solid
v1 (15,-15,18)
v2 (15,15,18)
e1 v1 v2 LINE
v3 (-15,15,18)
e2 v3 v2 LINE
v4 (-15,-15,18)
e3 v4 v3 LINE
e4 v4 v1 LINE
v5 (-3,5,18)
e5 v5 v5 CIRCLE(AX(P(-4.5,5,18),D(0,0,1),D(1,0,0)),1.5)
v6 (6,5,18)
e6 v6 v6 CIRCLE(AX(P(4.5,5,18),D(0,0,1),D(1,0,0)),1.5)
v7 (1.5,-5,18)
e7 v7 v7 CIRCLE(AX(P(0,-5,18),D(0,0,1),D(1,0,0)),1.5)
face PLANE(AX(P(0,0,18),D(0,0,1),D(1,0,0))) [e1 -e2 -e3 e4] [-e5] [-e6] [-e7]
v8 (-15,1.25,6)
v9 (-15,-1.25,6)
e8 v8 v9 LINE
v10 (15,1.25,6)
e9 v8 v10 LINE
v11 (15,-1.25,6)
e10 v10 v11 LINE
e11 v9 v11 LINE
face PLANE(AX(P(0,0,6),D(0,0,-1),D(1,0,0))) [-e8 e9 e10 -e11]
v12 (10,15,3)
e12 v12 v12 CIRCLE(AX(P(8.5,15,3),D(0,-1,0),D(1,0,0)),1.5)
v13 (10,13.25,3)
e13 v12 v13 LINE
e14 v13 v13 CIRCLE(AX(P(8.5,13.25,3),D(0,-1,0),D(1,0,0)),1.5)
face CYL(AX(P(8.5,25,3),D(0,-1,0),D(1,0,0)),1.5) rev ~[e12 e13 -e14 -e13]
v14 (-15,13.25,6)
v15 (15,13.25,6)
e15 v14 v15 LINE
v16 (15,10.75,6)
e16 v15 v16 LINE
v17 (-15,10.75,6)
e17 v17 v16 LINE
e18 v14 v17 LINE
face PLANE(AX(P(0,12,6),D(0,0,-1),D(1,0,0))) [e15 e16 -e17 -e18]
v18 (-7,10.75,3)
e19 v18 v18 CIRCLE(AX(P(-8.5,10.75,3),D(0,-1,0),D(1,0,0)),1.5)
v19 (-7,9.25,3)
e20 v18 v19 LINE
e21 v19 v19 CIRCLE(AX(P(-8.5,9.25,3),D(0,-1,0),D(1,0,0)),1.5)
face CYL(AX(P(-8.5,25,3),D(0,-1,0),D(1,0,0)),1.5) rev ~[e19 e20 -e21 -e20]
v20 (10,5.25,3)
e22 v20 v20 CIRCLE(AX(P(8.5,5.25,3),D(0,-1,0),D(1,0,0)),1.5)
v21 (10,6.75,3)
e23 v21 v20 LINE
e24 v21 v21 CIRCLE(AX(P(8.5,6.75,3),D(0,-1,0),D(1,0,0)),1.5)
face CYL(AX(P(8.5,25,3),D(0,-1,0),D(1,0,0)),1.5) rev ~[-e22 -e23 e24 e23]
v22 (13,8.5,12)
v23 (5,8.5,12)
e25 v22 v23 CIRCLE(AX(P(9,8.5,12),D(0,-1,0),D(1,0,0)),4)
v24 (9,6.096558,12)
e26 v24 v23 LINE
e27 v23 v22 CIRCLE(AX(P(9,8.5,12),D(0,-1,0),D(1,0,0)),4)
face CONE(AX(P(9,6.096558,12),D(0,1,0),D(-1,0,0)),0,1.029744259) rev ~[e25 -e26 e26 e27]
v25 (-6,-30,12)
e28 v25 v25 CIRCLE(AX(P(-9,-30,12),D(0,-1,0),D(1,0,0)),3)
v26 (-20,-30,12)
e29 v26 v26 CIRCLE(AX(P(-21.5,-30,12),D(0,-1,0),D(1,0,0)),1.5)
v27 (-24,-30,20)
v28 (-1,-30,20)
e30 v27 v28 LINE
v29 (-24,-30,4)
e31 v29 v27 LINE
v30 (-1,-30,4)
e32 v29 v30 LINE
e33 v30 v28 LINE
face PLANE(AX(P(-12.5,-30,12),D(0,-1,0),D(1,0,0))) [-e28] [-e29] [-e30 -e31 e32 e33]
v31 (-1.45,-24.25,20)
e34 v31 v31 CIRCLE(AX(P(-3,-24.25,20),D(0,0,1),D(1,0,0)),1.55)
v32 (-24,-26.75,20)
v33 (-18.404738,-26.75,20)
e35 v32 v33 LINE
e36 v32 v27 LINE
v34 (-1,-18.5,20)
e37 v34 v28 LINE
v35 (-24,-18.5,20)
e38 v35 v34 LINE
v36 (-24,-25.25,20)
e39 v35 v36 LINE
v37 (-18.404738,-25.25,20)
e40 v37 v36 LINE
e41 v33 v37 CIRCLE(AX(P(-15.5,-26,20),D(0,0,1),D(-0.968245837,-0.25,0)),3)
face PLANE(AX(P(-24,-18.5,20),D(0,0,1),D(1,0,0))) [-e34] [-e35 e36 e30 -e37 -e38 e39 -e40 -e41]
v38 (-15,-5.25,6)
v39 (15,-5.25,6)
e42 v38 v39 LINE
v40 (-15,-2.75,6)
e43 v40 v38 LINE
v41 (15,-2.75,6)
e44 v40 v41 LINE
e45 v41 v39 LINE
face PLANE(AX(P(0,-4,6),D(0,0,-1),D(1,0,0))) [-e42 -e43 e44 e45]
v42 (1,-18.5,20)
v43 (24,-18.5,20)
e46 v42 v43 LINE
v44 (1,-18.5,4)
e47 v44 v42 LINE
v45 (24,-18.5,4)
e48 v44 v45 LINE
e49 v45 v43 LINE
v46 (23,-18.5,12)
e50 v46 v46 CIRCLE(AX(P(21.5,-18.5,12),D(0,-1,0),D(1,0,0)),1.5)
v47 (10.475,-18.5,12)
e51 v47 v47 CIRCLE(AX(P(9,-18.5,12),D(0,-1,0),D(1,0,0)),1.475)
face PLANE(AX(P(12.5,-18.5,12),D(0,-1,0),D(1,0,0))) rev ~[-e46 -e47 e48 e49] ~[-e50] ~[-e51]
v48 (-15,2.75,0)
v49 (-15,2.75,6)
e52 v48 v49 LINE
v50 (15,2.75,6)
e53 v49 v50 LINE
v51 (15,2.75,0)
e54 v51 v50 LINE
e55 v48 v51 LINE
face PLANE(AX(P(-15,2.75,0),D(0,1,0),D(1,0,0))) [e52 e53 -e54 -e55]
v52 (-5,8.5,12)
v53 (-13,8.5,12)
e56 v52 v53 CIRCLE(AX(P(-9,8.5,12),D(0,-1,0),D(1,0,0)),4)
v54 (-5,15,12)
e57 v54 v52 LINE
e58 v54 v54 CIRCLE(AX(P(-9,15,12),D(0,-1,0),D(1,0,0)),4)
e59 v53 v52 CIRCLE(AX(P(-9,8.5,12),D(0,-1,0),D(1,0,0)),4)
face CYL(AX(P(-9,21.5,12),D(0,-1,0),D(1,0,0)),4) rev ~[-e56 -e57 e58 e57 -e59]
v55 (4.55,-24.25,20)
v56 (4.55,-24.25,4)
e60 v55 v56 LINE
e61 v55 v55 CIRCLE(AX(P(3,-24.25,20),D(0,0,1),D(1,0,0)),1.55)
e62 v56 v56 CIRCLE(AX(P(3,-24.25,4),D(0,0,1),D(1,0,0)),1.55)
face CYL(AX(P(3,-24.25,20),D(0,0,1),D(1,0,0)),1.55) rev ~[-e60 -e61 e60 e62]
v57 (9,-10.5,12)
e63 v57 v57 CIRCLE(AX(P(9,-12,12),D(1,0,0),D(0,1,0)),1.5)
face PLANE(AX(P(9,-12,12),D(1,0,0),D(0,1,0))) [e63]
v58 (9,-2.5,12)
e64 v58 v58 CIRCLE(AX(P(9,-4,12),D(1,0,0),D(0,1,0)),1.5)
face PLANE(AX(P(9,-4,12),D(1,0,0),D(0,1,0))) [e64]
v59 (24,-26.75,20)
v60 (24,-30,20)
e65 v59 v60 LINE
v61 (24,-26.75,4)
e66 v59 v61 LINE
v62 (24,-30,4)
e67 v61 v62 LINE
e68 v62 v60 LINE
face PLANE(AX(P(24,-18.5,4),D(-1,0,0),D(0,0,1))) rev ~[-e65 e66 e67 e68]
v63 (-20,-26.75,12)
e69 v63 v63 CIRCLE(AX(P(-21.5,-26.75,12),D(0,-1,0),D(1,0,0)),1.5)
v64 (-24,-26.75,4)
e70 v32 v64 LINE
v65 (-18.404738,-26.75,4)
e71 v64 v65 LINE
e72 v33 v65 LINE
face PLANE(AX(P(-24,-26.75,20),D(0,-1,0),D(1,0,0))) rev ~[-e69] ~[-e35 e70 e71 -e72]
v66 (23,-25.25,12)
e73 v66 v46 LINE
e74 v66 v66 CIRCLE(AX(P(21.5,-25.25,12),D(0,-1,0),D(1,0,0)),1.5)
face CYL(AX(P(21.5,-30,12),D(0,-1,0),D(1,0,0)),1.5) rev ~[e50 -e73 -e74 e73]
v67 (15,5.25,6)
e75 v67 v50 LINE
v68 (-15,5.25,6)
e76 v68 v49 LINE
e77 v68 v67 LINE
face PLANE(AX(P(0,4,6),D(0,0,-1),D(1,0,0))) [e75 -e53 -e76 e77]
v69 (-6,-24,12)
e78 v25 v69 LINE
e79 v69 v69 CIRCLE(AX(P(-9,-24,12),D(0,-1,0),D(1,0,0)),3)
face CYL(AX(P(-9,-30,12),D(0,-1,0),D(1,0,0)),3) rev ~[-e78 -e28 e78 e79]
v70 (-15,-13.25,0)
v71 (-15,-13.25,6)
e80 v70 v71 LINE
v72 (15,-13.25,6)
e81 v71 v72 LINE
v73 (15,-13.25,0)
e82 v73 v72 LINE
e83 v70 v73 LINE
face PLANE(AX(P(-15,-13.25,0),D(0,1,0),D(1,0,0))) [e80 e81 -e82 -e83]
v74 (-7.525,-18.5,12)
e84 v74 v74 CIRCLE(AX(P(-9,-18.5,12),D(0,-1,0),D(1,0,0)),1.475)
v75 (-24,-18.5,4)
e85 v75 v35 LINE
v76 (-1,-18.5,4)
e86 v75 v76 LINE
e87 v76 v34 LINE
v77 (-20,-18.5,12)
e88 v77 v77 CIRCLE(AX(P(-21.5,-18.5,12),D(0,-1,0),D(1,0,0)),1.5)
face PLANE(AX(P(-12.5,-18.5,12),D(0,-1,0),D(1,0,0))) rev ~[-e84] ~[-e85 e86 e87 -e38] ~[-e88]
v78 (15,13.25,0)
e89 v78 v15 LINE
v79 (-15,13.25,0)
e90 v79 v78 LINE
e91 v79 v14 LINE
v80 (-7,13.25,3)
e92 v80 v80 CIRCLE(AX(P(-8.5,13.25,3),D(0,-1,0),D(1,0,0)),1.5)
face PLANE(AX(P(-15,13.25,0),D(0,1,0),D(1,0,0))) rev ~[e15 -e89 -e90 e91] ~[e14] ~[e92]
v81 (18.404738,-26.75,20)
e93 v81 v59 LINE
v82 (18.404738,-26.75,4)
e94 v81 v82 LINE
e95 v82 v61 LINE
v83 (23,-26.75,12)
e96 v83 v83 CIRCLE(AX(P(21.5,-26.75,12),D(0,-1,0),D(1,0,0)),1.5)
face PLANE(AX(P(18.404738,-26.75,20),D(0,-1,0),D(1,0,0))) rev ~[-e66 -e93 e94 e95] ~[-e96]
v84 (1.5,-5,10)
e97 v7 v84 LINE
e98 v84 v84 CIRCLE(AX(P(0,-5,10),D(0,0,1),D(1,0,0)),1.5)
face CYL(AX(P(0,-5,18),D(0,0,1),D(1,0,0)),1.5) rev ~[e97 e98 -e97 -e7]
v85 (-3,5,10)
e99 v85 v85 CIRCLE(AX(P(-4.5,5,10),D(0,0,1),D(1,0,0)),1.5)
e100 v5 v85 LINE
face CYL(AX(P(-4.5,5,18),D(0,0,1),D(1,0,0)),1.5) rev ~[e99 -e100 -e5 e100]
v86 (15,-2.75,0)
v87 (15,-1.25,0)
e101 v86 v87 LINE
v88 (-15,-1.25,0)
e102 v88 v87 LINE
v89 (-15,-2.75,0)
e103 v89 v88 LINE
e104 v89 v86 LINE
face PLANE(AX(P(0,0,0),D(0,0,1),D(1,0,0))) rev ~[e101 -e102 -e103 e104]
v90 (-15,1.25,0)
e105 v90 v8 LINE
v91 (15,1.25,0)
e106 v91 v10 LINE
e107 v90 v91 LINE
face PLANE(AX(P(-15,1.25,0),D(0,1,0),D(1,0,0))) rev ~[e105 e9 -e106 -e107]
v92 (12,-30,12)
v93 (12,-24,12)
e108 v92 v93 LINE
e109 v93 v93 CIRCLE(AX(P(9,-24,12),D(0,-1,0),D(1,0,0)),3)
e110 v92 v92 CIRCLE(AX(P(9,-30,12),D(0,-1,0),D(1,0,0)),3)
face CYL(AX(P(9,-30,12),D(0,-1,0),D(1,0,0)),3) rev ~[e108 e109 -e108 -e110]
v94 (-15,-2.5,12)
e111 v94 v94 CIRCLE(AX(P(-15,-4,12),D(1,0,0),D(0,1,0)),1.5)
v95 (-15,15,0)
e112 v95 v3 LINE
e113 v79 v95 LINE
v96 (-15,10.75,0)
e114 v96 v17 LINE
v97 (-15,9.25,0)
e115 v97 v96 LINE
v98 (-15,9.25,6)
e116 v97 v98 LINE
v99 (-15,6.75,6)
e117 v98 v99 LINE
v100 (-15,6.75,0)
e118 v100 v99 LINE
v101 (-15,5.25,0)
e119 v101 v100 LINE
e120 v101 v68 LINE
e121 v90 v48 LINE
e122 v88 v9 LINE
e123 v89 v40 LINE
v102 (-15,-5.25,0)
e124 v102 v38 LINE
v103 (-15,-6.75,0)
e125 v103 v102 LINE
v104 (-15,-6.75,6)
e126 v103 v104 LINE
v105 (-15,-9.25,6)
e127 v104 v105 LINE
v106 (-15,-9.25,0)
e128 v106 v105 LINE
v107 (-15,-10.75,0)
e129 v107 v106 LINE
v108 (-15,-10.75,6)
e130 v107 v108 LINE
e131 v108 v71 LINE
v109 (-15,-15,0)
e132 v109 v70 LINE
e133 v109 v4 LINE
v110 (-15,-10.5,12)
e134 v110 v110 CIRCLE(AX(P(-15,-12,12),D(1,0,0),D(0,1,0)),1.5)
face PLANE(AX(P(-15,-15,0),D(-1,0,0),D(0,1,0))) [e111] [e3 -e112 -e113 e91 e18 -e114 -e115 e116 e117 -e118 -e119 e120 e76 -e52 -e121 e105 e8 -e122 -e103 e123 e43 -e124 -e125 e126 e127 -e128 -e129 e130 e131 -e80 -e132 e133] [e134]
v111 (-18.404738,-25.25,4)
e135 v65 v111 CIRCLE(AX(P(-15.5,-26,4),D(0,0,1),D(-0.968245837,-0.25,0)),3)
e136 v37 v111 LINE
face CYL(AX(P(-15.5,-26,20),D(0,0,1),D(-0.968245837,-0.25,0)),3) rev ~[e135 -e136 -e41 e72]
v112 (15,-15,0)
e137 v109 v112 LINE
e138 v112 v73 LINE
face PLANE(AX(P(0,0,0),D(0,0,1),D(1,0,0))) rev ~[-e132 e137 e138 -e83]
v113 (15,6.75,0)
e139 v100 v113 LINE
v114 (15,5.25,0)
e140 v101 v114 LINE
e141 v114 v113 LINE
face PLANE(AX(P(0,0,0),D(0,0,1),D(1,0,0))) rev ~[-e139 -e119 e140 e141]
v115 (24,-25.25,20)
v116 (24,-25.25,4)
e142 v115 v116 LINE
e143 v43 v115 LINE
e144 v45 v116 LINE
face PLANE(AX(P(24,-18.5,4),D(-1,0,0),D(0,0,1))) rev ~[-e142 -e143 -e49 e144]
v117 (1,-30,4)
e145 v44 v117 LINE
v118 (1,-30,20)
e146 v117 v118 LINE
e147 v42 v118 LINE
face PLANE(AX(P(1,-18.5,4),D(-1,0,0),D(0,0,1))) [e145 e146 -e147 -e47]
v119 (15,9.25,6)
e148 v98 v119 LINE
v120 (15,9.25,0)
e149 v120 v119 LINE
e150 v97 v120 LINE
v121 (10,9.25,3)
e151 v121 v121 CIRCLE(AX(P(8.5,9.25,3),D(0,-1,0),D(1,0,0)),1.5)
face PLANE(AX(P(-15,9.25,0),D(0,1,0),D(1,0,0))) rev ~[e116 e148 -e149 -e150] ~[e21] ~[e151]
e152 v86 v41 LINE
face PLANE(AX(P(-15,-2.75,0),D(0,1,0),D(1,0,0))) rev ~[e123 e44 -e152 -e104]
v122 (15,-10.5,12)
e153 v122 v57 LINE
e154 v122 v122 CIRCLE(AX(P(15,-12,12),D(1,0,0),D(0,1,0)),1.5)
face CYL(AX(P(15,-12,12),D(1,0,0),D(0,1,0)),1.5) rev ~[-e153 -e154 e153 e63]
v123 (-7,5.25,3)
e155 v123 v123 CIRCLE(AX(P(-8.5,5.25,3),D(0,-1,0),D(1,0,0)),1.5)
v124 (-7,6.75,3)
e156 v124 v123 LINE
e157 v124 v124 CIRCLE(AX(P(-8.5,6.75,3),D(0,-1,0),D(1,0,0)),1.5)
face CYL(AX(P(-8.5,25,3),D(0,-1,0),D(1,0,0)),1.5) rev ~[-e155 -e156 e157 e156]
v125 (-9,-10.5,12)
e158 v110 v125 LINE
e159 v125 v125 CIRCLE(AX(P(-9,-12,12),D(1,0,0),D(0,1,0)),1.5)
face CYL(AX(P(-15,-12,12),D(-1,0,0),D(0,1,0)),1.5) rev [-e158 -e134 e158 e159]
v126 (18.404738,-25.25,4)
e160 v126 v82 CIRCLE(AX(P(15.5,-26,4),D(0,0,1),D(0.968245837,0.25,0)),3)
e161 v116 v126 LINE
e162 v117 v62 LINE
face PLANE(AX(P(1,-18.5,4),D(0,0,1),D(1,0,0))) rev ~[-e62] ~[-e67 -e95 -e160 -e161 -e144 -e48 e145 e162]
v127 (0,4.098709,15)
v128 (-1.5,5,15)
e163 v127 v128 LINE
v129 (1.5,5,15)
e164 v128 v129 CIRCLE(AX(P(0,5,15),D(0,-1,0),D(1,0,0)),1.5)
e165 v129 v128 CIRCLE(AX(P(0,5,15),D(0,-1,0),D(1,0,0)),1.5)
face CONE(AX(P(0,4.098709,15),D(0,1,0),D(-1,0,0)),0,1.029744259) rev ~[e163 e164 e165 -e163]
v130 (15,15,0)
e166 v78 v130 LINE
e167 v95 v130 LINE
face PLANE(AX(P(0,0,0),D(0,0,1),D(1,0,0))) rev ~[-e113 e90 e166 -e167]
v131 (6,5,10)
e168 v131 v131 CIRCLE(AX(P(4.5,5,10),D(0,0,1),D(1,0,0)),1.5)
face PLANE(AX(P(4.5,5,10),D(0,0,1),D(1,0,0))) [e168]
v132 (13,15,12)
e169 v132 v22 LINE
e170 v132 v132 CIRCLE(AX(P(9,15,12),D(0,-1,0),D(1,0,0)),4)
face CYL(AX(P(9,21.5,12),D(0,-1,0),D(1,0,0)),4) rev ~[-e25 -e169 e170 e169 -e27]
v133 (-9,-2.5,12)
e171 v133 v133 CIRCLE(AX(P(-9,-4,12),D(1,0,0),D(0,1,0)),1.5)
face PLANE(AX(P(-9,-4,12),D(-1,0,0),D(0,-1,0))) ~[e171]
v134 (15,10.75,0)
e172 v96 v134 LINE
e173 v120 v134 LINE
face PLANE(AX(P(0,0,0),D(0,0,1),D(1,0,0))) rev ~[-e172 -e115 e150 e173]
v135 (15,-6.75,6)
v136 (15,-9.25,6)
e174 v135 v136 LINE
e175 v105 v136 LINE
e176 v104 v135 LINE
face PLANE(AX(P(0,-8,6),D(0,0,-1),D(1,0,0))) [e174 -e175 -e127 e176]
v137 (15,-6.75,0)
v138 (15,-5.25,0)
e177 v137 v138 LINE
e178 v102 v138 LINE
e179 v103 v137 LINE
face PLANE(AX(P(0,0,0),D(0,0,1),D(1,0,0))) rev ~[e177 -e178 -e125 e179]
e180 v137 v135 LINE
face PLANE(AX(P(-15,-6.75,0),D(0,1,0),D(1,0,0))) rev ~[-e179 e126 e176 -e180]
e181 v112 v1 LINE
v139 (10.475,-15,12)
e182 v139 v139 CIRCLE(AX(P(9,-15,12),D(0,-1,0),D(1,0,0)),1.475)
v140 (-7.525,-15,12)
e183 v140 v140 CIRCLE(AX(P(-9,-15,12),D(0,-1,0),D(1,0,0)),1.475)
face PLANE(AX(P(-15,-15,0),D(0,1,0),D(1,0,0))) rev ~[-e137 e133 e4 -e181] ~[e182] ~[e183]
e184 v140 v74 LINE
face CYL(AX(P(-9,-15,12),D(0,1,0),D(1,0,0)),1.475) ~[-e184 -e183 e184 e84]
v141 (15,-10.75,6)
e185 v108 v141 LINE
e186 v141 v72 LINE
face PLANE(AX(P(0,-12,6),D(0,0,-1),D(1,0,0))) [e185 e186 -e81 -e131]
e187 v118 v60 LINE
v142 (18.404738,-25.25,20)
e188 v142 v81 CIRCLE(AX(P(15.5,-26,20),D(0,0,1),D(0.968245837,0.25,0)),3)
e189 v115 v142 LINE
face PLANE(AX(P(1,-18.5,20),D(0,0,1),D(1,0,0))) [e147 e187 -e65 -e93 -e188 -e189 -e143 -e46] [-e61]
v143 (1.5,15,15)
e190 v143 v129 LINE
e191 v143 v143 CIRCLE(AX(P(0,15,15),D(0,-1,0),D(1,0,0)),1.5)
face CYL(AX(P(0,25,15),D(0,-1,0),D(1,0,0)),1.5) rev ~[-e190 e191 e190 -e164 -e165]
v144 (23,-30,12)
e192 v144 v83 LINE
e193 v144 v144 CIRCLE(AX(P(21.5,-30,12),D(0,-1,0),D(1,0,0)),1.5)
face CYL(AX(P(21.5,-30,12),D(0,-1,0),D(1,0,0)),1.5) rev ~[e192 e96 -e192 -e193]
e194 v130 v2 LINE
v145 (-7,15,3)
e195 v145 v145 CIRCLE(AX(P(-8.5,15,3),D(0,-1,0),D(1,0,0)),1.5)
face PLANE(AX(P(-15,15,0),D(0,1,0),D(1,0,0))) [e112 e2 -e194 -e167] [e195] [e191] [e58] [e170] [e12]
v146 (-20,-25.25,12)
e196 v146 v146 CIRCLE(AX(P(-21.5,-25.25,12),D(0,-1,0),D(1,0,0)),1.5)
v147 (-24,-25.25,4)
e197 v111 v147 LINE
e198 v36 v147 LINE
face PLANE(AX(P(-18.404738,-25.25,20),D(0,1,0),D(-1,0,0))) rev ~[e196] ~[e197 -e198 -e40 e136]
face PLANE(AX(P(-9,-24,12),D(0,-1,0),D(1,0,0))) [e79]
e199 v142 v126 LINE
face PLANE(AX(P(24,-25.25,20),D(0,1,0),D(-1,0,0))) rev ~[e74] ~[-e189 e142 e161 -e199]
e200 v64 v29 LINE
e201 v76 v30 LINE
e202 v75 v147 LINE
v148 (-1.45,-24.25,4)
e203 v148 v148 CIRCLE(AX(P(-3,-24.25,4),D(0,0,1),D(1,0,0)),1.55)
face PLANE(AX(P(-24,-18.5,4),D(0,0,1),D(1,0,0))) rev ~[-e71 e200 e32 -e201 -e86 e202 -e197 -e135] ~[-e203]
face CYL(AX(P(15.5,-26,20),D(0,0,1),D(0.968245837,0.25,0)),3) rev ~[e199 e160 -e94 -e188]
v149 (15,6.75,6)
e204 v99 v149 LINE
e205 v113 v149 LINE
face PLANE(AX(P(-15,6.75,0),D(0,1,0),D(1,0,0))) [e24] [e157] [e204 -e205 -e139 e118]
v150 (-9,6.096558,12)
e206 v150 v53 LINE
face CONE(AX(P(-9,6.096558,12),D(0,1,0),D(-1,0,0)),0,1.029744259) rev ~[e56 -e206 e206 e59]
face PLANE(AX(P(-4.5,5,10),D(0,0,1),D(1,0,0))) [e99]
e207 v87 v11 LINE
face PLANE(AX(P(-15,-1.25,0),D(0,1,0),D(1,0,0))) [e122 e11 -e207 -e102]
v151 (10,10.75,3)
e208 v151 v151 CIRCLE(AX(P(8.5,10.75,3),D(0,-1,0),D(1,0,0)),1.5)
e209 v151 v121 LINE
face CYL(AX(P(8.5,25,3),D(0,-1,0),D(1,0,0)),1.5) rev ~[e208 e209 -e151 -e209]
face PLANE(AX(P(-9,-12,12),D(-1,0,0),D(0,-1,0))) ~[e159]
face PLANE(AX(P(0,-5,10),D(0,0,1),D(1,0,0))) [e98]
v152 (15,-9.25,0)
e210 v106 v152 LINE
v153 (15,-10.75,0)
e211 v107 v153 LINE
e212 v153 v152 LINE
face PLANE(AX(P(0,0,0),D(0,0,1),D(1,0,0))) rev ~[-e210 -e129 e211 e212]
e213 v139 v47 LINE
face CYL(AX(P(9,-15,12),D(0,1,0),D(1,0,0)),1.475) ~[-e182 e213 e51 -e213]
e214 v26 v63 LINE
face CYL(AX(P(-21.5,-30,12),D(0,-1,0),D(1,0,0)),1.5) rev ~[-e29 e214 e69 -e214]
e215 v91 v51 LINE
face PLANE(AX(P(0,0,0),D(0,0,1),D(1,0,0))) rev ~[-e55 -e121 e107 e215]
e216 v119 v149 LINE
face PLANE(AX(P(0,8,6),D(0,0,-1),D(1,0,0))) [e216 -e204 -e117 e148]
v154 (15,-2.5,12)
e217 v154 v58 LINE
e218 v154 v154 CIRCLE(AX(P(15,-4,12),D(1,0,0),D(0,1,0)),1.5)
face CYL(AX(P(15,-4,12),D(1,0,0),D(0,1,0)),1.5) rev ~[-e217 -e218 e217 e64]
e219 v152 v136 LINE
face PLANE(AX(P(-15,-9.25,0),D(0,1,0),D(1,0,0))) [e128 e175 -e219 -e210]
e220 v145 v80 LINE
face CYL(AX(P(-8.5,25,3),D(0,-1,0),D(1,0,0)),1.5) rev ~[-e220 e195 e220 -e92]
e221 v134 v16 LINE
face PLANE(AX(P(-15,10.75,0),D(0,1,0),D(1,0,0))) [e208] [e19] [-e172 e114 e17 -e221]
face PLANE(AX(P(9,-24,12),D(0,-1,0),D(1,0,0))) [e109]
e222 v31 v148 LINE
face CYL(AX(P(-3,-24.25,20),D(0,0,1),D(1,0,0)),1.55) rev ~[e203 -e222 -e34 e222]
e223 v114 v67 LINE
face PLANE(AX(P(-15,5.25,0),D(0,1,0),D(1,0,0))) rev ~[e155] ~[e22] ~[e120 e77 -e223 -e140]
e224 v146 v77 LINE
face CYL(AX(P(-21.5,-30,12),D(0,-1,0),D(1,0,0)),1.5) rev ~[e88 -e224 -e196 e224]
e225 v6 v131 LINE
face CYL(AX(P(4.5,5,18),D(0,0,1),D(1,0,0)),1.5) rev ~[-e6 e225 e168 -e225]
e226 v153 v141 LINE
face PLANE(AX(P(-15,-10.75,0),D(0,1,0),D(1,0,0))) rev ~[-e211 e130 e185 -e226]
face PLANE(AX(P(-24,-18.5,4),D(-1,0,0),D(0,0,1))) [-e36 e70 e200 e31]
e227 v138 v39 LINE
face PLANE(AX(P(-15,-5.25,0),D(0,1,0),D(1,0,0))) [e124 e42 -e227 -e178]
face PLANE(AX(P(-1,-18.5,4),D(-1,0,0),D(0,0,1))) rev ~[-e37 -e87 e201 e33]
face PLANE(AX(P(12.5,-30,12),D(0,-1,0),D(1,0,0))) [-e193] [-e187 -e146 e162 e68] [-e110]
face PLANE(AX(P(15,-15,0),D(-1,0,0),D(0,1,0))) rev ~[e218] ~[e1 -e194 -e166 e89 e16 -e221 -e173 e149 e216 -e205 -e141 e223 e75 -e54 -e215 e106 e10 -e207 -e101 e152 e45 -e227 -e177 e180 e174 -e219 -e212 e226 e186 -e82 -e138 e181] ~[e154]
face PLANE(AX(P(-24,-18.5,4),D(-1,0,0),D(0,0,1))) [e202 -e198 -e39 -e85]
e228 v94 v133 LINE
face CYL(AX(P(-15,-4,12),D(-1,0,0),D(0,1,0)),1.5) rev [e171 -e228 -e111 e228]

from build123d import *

# Parameters (mm, degrees)
F0_W      = 30
F0_H      = 30
F15_DEPTH = 18
F1_D      = 8
F1_DEPTH  = 6.5
F1_TIP    = 2.4034424761
F17_W     = 30
F17_H     = 2.5
F18_DEPTH = 6
F19_D     = 3
F19_DEPTH = 10
F19_TIP   = 0.9012909285
F2_R      = 1.475
F3_DEPTH  = 3.5
F20_W     = 23
F20_H     = 16
F21_DEPTH = 11.5
F22_R     = 3
F5_DEPTH  = 6
F22_R_2   = 1.5
F6_DEPTH  = 11.5
F7_R      = 1.55
F23_DEPTH = 16
F8_R      = 1.5
F9_DEPTH  = 8
F10_DEPTH = 6
F11_R     = 1.5
F12_DEPTH = 6


# Not quite as in the source:
# - a feature names something its author has since deleted; it is built from what else it names


with BuildPart() as f15:
    # F0 (on Top) → F15 (new body)
    with BuildSketch(Plane.XY):
        Rectangle(F0_W, F0_H)
    extrude(amount=F15_DEPTH)

    # F1
    with Locations(Plane(origin=(0, 15, 0), x_dir=(-1, 0, 0), z_dir=(0, 1, 0))):
        with Locations((-9, 12), (9, 12)):
            Hole(F1_D / 2, depth=F1_DEPTH)
            with Locations((0, 0, -(F1_DEPTH + F1_TIP / 2))):  # 118° drill point
                Cone(0, F1_D / 2, F1_TIP, mode=Mode.SUBTRACT)

    # F17 (on face) → F18 (cut)
    with BuildSketch(Plane(origin=(0, 0, 0), x_dir=(1, 0, 0), z_dir=(0, 0, -1))):
        with Locations((0, 12)):
            Rectangle(F17_W, F17_H)
        with Locations((0, 8)):
            Rectangle(F17_W, F17_H)
        with Locations((0, 4)):
            Rectangle(F17_W, F17_H)
        Rectangle(F17_W, F17_H)
        with Locations((0, -4)):
            Rectangle(F17_W, F17_H)
        with Locations((0, -8)):
            Rectangle(F17_W, F17_H)
        with Locations((0, -12)):
            Rectangle(F17_W, F17_H)
    extrude(amount=-F18_DEPTH, mode=Mode.SUBTRACT)

    # F19
    with Locations(Plane(origin=(0, 15, 0), x_dir=(-1, 0, 0), z_dir=(0, 1, 0))):
        with Locations((8.5, 3), (-8.5, 3), (0, 15)):
            Hole(F19_D / 2, depth=F19_DEPTH)
            with Locations((0, 0, -(F19_DEPTH + F19_TIP / 2))):  # 118° drill point
                Cone(0, F19_D / 2, F19_TIP, mode=Mode.SUBTRACT)

    # F2 (on face) → F3 (join)
    with BuildSketch(Plane.XZ.offset(15)):
        with Locations((-9, 12)):
            Circle(F2_R)
        with Locations((9, 12)):
            Circle(F2_R)
    extrude(amount=F3_DEPTH)

    # F20 (on offset) → F21 (join)
    with BuildSketch(Plane.XZ.offset(18.5)):
        with Locations((-12.5, 12)):
            Rectangle(F20_W, F20_H)
        with Locations((12.5, 12)):
            Rectangle(F20_W, F20_H)
    extrude(amount=F21_DEPTH)

    # F22 (on face) → F5 (cut)
    with BuildSketch(Plane.XZ.offset(30)):
        with Locations((-9, 12)):
            Circle(F22_R)
        with Locations((9, 12)):
            Circle(F22_R)
    extrude(amount=-F5_DEPTH, mode=Mode.SUBTRACT)

    # F22 (on face) → F6 (cut, through all)
    with BuildSketch(Plane.XZ.offset(30)):
        with Locations((-21.5, 12)):
            Circle(F22_R_2)
        with Locations((21.5, 12)):
            Circle(F22_R_2)
    extrude(amount=-F6_DEPTH, mode=Mode.SUBTRACT)

    # F7 (on face) → F23 (cut, through all)
    with BuildSketch(Plane.XY.offset(20)):
        with BuildLine():
            Line((-24, -26.75), (-18.4047375097, -26.75))
            ThreePointArc((-18.4047375097, -26.75), (-12.5, -26), (-18.4047375097, -25.25))
            Line((-18.4047375097, -25.25), (-24, -25.25))
            Line((-24, -25.25), (-24, -26.75))
        make_face()
        with Locations((-3, -24.25)):
            Circle(F7_R)
        with Locations((3, -24.25)):
            Circle(F7_R)
        with BuildLine():
            Line((18.4047375097, -26.75), (24, -26.75))
            Line((24, -26.75), (24, -25.25))
            Line((24, -25.25), (18.4047375097, -25.25))
            ThreePointArc((18.4047375097, -25.25), (12.5, -26), (18.4047375097, -26.75))
        make_face()
    extrude(amount=-F23_DEPTH, mode=Mode.SUBTRACT)

    # F8 (on face) → F9 (cut)
    with BuildSketch(Plane.XY.offset(18)):
        with Locations((0, -5)):
            Circle(F8_R)
        with Locations((4.5, 5)):
            Circle(F8_R)
        with Locations((-4.5, 5)):
            Circle(F8_R)
    extrude(amount=-F9_DEPTH, mode=Mode.SUBTRACT)

    # F22 (on face) → F10 (cut)
    with BuildSketch(Plane.XZ.offset(30)):
        with Locations((-9, 12)):
            Circle(F22_R)
    extrude(amount=-F10_DEPTH, mode=Mode.SUBTRACT)

    # F13: F12b, F12 across plane


with BuildPart() as f12:
    # F11 (on face) → F12 (new body)
    with BuildSketch(Plane.YZ.offset(15)):
        with Locations((-12, 12)):
            Circle(F11_R)
    extrude(amount=-F12_DEPTH)


with BuildPart() as f12b:
    # F11 (on face) → F12, piece 2 (new body)
    with BuildSketch(Plane.YZ.offset(15)):
        with Locations((-4, 12)):
            Circle(F11_R)
    extrude(amount=-F12_DEPTH)


with BuildPart() as f15_1:
    add(f15.part)
    add(f12b.part.mirror(Plane.YZ), mode=Mode.SUBTRACT)
    add(f12.part.mirror(Plane.YZ), mode=Mode.SUBTRACT)

    # F14: cut F12, F12b
    add(f12.part, mode=Mode.SUBTRACT)
    add(f12b.part, mode=Mode.SUBTRACT)


solid = f15_1.part
